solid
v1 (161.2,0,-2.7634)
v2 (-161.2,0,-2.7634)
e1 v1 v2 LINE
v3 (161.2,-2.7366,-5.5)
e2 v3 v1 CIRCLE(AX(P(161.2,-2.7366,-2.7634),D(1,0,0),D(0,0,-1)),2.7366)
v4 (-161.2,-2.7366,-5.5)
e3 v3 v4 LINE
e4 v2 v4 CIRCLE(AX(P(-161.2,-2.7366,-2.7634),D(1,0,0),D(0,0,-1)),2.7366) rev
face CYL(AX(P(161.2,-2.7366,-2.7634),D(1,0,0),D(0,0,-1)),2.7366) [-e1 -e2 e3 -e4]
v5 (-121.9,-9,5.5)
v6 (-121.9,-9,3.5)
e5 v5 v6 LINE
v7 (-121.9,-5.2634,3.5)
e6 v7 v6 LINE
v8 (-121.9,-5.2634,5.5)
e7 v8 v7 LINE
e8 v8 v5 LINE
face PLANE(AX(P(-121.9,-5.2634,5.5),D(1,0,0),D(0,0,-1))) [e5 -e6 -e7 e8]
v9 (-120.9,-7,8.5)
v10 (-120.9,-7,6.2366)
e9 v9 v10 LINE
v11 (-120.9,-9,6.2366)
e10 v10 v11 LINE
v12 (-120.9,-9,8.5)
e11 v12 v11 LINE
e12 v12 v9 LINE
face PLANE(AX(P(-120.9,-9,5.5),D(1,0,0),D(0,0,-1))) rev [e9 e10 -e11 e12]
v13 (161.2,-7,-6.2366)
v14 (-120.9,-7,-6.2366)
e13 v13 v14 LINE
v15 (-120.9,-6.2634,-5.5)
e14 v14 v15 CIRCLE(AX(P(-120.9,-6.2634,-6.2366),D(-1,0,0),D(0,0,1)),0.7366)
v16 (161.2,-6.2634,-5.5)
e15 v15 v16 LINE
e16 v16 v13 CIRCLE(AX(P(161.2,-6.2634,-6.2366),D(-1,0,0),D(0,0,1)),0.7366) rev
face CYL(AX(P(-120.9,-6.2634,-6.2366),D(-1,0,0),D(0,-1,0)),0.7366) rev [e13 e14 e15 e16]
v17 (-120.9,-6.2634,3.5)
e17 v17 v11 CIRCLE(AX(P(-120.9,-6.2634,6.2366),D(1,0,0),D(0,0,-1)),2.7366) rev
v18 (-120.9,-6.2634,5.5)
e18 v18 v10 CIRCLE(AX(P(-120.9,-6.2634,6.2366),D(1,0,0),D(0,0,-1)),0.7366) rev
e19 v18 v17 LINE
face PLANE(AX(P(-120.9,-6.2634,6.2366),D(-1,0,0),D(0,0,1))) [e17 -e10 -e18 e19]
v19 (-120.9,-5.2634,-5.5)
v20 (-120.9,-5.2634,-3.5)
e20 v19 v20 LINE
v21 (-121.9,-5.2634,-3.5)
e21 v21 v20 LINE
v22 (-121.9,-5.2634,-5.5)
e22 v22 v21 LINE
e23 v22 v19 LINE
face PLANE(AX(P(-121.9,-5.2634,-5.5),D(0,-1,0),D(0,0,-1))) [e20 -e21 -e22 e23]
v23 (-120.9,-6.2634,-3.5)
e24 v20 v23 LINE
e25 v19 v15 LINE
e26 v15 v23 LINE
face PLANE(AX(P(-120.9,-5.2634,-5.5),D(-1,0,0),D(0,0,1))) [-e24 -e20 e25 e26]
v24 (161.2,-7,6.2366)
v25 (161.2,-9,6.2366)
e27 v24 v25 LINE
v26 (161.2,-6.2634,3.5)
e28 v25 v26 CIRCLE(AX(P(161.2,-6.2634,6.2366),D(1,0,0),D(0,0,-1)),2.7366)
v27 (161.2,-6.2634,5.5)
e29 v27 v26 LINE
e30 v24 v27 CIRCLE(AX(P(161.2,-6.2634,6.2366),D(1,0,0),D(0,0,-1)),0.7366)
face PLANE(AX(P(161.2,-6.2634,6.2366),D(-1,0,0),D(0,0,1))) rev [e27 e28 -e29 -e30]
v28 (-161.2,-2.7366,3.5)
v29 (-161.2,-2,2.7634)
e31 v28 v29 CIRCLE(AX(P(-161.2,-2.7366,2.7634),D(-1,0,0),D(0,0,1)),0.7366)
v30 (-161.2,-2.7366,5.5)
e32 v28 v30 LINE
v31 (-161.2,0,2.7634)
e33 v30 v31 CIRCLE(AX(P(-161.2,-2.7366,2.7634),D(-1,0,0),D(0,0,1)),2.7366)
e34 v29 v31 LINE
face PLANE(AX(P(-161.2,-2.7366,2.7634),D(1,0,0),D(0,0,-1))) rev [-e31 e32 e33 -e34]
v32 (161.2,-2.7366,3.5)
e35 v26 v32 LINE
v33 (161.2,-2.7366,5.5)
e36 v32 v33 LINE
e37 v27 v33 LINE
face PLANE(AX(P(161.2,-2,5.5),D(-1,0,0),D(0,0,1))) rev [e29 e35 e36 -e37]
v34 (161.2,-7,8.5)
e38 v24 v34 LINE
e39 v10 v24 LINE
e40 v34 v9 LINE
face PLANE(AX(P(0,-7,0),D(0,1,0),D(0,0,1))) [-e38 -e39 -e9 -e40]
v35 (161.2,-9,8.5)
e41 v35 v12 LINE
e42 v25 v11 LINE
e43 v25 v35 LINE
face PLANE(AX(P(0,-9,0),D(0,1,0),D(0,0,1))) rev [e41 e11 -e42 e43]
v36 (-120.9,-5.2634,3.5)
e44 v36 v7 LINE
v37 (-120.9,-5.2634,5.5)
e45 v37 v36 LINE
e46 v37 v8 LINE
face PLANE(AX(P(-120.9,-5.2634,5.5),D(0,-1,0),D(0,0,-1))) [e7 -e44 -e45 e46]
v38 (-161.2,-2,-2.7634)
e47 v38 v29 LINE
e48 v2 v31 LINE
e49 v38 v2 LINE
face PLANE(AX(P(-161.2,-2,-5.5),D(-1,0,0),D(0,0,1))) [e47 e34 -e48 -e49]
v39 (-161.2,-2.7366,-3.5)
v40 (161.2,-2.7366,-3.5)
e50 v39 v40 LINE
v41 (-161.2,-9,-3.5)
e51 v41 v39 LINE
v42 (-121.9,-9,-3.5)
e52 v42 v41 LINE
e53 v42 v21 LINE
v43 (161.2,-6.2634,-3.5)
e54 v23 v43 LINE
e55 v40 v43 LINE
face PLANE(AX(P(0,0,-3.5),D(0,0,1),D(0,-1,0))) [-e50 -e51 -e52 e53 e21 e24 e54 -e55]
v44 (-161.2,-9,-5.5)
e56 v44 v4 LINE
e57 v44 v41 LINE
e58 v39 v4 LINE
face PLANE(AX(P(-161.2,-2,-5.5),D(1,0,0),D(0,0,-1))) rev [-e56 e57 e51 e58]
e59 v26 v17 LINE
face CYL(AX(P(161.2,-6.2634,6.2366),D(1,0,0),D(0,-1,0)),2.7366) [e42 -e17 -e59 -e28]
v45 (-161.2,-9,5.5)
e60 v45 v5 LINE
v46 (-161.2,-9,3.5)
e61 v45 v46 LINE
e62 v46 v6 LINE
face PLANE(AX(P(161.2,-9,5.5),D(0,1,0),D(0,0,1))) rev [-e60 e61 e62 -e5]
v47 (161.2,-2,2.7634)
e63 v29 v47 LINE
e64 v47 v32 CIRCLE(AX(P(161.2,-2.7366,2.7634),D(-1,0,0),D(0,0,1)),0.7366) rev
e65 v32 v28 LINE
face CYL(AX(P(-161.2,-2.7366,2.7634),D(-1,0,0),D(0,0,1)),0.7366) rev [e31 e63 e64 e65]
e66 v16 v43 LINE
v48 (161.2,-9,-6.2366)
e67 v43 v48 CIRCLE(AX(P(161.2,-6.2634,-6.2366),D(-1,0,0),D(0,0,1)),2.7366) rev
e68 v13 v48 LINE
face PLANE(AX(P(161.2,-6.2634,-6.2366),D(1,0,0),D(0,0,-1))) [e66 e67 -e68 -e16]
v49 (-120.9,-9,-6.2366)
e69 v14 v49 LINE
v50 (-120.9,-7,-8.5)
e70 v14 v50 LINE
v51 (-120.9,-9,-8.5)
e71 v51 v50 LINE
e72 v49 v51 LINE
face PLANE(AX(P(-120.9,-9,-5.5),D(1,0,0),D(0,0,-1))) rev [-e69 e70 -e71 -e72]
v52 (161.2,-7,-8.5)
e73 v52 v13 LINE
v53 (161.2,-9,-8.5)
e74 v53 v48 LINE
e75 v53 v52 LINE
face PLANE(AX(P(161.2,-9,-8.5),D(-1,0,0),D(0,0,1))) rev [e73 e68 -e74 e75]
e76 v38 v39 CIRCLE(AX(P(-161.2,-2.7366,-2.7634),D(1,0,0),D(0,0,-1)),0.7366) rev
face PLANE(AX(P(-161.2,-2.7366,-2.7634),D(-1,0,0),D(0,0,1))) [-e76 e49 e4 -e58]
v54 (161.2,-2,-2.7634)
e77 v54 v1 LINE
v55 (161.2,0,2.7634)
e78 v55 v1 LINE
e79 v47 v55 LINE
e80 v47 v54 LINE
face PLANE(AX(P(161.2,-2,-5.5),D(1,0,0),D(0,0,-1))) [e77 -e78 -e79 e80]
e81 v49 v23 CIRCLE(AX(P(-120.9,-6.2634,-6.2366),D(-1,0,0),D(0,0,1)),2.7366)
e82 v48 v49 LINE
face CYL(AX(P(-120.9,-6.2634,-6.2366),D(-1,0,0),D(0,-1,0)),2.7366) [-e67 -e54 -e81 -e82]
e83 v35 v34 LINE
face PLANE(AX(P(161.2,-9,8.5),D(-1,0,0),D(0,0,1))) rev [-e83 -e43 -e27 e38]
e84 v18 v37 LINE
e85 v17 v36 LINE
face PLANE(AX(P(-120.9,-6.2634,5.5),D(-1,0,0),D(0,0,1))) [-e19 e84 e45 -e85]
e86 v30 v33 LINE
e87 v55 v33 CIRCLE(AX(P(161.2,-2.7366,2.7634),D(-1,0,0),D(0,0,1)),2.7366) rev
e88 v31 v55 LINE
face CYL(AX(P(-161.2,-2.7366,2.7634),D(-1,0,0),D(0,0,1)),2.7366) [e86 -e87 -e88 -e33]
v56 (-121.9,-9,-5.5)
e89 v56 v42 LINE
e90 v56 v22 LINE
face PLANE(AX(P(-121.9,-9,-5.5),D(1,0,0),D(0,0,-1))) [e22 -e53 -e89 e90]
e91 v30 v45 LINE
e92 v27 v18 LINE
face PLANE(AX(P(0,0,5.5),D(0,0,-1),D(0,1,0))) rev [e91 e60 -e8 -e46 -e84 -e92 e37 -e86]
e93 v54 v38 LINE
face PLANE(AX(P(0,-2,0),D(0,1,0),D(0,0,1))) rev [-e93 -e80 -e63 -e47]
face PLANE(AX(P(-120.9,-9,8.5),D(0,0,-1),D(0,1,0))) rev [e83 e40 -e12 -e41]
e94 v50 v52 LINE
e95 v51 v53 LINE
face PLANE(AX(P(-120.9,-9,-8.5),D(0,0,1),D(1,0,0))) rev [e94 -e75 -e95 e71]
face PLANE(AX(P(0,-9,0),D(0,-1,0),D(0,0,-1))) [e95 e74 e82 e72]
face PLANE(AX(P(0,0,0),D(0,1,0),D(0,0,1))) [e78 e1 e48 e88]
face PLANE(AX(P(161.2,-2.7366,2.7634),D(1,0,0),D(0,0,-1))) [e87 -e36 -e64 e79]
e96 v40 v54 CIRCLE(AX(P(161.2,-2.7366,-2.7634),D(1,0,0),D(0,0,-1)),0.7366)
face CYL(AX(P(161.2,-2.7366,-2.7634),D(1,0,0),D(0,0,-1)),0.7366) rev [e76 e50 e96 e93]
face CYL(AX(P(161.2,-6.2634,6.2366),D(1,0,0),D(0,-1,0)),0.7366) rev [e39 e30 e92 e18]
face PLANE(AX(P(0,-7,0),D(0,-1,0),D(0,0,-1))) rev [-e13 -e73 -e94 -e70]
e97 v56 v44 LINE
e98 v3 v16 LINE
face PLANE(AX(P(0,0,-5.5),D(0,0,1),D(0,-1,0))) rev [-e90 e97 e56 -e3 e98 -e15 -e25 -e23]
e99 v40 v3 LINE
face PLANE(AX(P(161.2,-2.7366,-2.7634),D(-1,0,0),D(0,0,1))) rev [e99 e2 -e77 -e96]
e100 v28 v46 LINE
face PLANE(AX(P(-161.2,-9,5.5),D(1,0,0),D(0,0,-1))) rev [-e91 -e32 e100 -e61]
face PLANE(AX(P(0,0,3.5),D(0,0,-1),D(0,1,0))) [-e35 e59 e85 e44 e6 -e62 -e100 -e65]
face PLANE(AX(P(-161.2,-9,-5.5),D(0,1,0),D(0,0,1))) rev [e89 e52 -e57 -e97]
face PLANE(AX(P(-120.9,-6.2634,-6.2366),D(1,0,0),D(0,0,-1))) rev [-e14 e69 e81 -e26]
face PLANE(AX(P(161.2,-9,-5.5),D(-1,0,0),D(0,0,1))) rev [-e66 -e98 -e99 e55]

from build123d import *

# Parameters (mm, degrees)
SKETCH2_W                       = 322.4
SKETCH2_H                       = 11
BASE_FLANGE1_DEPTH              = 2
EDGE_FLANGE1_STRIP_W            = 9.4732
EDGE_FLANGE1_STRIP_H            = 2
EDGE_FLANGE1_STRIP_CUT_DEPTH    = 322.4
EDGE_FLANGE1_STRIP_2_W          = 9.4732
EDGE_FLANGE1_STRIP_2_H          = 2
EDGE_FLANGE1_STRIP_CUT_2_DEPTH  = 322.4
EDGE_FLANGE1_DEPTH              = 322.4
EDGE_FLANGE1_BEND_DEPTH         = 322.4
EDGE_FLANGE3_STRIP_W            = 9.4732
EDGE_FLANGE3_STRIP_H            = 2
EDGE_FLANGE3_STRIP_CUT_DEPTH    = 282.1
EDGE_FLANGE3_RELIEF_W           = 10.4732
EDGE_FLANGE3_RELIEF_H           = 1
EDGE_FLANGE3_RELIEF_CUT_DEPTH   = 2
EDGE_FLANGE3_STRIP_2_W          = 9.4732
EDGE_FLANGE3_STRIP_2_H          = 2
EDGE_FLANGE3_STRIP_CUT_2_DEPTH  = 282.1
EDGE_FLANGE3_RELIEF_2_W         = 10.4732
EDGE_FLANGE3_RELIEF_2_H         = 1
EDGE_FLANGE3_RELIEF_CUT_2_DEPTH = 2
EDGE_FLANGE3_DEPTH              = 282.1
EDGE_FLANGE3_BEND_DEPTH         = 282.1


# Sheet-metal steps are written as plain solids
with BuildPart() as part:
    # Sketch2 → Base-Flange1 (new body)
    with BuildSketch(Plane(origin=(0, 0, 0), x_dir=(1, 0, 0), z_dir=(0, 1, 0))):
        Rectangle(SKETCH2_W, SKETCH2_H)
    extrude(amount=-BASE_FLANGE1_DEPTH)

    # Edge-Flange1 strip (across the edge) → Edge-Flange1 strip cut (cut)
    with BuildSketch(Plane(origin=(161.2, -2, 5.5), x_dir=(0, 0, -1), z_dir=(-1, 0, 0))):
        with Locations((-2, -1)):
            Rectangle(EDGE_FLANGE1_STRIP_W, EDGE_FLANGE1_STRIP_H)
    extrude(amount=EDGE_FLANGE1_STRIP_CUT_DEPTH, mode=Mode.SUBTRACT)

    # Edge-Flange1 strip 2 (across the edge) → Edge-Flange1 strip cut 2 (cut)
    with BuildSketch(Plane(origin=(-161.2, -2, -5.5), x_dir=(0, 0, 1), z_dir=(1, 0, 0))):
        with Locations((-2, -1)):
            Rectangle(EDGE_FLANGE1_STRIP_2_W, EDGE_FLANGE1_STRIP_2_H)
    extrude(amount=EDGE_FLANGE1_STRIP_CUT_2_DEPTH, mode=Mode.SUBTRACT)

    # Edge-Flange1 section (across the edge) → Edge-Flange1 (add)
    with BuildSketch(Plane(origin=(161.2, -2, 5.5), x_dir=(0, 0, -1), z_dir=(-1, 0, 0))):
        with BuildLine():
            Line((0, 0.7366), (0, 7))
            Line((0, 7), (2, 7))
            Line((2, 7), (2, 0.7366))
            ThreePointArc((2, 0.7366), (2.215745145, 0.215745145), (2.7366, 0))
            Line((2.7366, 0), (2.7366, -2))
            ThreePointArc((2.7366, -2), (0.801531583, -1.198468417), (0, 0.7366))
        make_face()
    extrude(amount=EDGE_FLANGE1_DEPTH)

    # Edge-Flange1 section 2 (across the edge) → Edge-Flange1 bend (add)
    with BuildSketch(Plane(origin=(-161.2, -2, -5.5), x_dir=(0, 0, 1), z_dir=(1, 0, 0))):
        with BuildLine():
            Line((0, 0.7366), (0, 7))
            Line((0, 7), (2, 7))
            Line((2, 7), (2, 0.7366))
            ThreePointArc((2, 0.7366), (2.215745145, 0.215745145), (2.7366, 0))
            Line((2.7366, 0), (2.7366, -2))
            ThreePointArc((2.7366, -2), (0.801531583, -1.198468417), (0, 0.7366))
        make_face()
    extrude(amount=EDGE_FLANGE1_BEND_DEPTH)

    # Edge-Flange3 strip (across the edge) → Edge-Flange3 strip cut (cut)
    with BuildSketch(Plane(origin=(-120.9, -9, 5.5), x_dir=(0, 1, 0), z_dir=(1, 0, 0))):
        with Locations((-2, -1)):
            Rectangle(EDGE_FLANGE3_STRIP_W, EDGE_FLANGE3_STRIP_H)
    extrude(amount=EDGE_FLANGE3_STRIP_CUT_DEPTH, mode=Mode.SUBTRACT)

    # Edge-Flange3 relief (on the sheet) → Edge-Flange3 relief cut (cut)
    with BuildSketch(Plane(origin=(-120.9, -6.2634, 5.5), x_dir=(0, 1, 0), z_dir=(0, 0, 1))):
        with Locations((-4.2366, 0.5)):
            Rectangle(EDGE_FLANGE3_RELIEF_W, EDGE_FLANGE3_RELIEF_H)
    extrude(amount=-EDGE_FLANGE3_RELIEF_CUT_DEPTH, mode=Mode.SUBTRACT)

    # Edge-Flange3 strip 2 (across the edge) → Edge-Flange3 strip cut 2 (cut)
    with BuildSketch(Plane(origin=(161.2, -9, -5.5), x_dir=(0, 1, 0), z_dir=(-1, 0, 0))):
        with Locations((-2, -1)):
            Rectangle(EDGE_FLANGE3_STRIP_2_W, EDGE_FLANGE3_STRIP_2_H)
    extrude(amount=EDGE_FLANGE3_STRIP_CUT_2_DEPTH, mode=Mode.SUBTRACT)

    # Edge-Flange3 relief 2 (on the sheet) → Edge-Flange3 relief cut 2 (cut)
    with BuildSketch(Plane(origin=(161.2, -6.2634, -5.5), x_dir=(0, 1, 0), z_dir=(0, 0, -1))):
        with Locations((-4.2366, -282.6)):
            Rectangle(EDGE_FLANGE3_RELIEF_2_W, EDGE_FLANGE3_RELIEF_2_H)
    extrude(amount=-EDGE_FLANGE3_RELIEF_CUT_2_DEPTH, mode=Mode.SUBTRACT)

    # Edge-Flange3 section (across the edge) → Edge-Flange3 (add)
    with BuildSketch(Plane(origin=(-120.9, -9, 5.5), x_dir=(0, 1, 0), z_dir=(1, 0, 0))):
        with BuildLine():
            Line((0, 0.7366), (0, 3))
            Line((0, 3), (2, 3))
            Line((2, 3), (2, 0.7366))
            ThreePointArc((2, 0.7366), (2.215745145, 0.215745145), (2.7366, 0))
            Line((2.7366, 0), (2.7366, -2))
            ThreePointArc((2.7366, -2), (0.801531583, -1.198468417), (0, 0.7366))
        make_face()
    extrude(amount=EDGE_FLANGE3_DEPTH)

    # Edge-Flange3 section 2 (across the edge) → Edge-Flange3 bend (add)
    with BuildSketch(Plane(origin=(161.2, -9, -5.5), x_dir=(0, 1, 0), z_dir=(-1, 0, 0))):
        with BuildLine():
            Line((0, 0.7366), (0, 3))
            Line((0, 3), (2, 3))
            Line((2, 3), (2, 0.7366))
            ThreePointArc((2, 0.7366), (2.215745145, 0.215745145), (2.7366, 0))
            Line((2.7366, 0), (2.7366, -2))
            ThreePointArc((2.7366, -2), (0.801531583, -1.198468417), (0, 0.7366))
        make_face()
    extrude(amount=EDGE_FLANGE3_BEND_DEPTH)


solid = part.part
